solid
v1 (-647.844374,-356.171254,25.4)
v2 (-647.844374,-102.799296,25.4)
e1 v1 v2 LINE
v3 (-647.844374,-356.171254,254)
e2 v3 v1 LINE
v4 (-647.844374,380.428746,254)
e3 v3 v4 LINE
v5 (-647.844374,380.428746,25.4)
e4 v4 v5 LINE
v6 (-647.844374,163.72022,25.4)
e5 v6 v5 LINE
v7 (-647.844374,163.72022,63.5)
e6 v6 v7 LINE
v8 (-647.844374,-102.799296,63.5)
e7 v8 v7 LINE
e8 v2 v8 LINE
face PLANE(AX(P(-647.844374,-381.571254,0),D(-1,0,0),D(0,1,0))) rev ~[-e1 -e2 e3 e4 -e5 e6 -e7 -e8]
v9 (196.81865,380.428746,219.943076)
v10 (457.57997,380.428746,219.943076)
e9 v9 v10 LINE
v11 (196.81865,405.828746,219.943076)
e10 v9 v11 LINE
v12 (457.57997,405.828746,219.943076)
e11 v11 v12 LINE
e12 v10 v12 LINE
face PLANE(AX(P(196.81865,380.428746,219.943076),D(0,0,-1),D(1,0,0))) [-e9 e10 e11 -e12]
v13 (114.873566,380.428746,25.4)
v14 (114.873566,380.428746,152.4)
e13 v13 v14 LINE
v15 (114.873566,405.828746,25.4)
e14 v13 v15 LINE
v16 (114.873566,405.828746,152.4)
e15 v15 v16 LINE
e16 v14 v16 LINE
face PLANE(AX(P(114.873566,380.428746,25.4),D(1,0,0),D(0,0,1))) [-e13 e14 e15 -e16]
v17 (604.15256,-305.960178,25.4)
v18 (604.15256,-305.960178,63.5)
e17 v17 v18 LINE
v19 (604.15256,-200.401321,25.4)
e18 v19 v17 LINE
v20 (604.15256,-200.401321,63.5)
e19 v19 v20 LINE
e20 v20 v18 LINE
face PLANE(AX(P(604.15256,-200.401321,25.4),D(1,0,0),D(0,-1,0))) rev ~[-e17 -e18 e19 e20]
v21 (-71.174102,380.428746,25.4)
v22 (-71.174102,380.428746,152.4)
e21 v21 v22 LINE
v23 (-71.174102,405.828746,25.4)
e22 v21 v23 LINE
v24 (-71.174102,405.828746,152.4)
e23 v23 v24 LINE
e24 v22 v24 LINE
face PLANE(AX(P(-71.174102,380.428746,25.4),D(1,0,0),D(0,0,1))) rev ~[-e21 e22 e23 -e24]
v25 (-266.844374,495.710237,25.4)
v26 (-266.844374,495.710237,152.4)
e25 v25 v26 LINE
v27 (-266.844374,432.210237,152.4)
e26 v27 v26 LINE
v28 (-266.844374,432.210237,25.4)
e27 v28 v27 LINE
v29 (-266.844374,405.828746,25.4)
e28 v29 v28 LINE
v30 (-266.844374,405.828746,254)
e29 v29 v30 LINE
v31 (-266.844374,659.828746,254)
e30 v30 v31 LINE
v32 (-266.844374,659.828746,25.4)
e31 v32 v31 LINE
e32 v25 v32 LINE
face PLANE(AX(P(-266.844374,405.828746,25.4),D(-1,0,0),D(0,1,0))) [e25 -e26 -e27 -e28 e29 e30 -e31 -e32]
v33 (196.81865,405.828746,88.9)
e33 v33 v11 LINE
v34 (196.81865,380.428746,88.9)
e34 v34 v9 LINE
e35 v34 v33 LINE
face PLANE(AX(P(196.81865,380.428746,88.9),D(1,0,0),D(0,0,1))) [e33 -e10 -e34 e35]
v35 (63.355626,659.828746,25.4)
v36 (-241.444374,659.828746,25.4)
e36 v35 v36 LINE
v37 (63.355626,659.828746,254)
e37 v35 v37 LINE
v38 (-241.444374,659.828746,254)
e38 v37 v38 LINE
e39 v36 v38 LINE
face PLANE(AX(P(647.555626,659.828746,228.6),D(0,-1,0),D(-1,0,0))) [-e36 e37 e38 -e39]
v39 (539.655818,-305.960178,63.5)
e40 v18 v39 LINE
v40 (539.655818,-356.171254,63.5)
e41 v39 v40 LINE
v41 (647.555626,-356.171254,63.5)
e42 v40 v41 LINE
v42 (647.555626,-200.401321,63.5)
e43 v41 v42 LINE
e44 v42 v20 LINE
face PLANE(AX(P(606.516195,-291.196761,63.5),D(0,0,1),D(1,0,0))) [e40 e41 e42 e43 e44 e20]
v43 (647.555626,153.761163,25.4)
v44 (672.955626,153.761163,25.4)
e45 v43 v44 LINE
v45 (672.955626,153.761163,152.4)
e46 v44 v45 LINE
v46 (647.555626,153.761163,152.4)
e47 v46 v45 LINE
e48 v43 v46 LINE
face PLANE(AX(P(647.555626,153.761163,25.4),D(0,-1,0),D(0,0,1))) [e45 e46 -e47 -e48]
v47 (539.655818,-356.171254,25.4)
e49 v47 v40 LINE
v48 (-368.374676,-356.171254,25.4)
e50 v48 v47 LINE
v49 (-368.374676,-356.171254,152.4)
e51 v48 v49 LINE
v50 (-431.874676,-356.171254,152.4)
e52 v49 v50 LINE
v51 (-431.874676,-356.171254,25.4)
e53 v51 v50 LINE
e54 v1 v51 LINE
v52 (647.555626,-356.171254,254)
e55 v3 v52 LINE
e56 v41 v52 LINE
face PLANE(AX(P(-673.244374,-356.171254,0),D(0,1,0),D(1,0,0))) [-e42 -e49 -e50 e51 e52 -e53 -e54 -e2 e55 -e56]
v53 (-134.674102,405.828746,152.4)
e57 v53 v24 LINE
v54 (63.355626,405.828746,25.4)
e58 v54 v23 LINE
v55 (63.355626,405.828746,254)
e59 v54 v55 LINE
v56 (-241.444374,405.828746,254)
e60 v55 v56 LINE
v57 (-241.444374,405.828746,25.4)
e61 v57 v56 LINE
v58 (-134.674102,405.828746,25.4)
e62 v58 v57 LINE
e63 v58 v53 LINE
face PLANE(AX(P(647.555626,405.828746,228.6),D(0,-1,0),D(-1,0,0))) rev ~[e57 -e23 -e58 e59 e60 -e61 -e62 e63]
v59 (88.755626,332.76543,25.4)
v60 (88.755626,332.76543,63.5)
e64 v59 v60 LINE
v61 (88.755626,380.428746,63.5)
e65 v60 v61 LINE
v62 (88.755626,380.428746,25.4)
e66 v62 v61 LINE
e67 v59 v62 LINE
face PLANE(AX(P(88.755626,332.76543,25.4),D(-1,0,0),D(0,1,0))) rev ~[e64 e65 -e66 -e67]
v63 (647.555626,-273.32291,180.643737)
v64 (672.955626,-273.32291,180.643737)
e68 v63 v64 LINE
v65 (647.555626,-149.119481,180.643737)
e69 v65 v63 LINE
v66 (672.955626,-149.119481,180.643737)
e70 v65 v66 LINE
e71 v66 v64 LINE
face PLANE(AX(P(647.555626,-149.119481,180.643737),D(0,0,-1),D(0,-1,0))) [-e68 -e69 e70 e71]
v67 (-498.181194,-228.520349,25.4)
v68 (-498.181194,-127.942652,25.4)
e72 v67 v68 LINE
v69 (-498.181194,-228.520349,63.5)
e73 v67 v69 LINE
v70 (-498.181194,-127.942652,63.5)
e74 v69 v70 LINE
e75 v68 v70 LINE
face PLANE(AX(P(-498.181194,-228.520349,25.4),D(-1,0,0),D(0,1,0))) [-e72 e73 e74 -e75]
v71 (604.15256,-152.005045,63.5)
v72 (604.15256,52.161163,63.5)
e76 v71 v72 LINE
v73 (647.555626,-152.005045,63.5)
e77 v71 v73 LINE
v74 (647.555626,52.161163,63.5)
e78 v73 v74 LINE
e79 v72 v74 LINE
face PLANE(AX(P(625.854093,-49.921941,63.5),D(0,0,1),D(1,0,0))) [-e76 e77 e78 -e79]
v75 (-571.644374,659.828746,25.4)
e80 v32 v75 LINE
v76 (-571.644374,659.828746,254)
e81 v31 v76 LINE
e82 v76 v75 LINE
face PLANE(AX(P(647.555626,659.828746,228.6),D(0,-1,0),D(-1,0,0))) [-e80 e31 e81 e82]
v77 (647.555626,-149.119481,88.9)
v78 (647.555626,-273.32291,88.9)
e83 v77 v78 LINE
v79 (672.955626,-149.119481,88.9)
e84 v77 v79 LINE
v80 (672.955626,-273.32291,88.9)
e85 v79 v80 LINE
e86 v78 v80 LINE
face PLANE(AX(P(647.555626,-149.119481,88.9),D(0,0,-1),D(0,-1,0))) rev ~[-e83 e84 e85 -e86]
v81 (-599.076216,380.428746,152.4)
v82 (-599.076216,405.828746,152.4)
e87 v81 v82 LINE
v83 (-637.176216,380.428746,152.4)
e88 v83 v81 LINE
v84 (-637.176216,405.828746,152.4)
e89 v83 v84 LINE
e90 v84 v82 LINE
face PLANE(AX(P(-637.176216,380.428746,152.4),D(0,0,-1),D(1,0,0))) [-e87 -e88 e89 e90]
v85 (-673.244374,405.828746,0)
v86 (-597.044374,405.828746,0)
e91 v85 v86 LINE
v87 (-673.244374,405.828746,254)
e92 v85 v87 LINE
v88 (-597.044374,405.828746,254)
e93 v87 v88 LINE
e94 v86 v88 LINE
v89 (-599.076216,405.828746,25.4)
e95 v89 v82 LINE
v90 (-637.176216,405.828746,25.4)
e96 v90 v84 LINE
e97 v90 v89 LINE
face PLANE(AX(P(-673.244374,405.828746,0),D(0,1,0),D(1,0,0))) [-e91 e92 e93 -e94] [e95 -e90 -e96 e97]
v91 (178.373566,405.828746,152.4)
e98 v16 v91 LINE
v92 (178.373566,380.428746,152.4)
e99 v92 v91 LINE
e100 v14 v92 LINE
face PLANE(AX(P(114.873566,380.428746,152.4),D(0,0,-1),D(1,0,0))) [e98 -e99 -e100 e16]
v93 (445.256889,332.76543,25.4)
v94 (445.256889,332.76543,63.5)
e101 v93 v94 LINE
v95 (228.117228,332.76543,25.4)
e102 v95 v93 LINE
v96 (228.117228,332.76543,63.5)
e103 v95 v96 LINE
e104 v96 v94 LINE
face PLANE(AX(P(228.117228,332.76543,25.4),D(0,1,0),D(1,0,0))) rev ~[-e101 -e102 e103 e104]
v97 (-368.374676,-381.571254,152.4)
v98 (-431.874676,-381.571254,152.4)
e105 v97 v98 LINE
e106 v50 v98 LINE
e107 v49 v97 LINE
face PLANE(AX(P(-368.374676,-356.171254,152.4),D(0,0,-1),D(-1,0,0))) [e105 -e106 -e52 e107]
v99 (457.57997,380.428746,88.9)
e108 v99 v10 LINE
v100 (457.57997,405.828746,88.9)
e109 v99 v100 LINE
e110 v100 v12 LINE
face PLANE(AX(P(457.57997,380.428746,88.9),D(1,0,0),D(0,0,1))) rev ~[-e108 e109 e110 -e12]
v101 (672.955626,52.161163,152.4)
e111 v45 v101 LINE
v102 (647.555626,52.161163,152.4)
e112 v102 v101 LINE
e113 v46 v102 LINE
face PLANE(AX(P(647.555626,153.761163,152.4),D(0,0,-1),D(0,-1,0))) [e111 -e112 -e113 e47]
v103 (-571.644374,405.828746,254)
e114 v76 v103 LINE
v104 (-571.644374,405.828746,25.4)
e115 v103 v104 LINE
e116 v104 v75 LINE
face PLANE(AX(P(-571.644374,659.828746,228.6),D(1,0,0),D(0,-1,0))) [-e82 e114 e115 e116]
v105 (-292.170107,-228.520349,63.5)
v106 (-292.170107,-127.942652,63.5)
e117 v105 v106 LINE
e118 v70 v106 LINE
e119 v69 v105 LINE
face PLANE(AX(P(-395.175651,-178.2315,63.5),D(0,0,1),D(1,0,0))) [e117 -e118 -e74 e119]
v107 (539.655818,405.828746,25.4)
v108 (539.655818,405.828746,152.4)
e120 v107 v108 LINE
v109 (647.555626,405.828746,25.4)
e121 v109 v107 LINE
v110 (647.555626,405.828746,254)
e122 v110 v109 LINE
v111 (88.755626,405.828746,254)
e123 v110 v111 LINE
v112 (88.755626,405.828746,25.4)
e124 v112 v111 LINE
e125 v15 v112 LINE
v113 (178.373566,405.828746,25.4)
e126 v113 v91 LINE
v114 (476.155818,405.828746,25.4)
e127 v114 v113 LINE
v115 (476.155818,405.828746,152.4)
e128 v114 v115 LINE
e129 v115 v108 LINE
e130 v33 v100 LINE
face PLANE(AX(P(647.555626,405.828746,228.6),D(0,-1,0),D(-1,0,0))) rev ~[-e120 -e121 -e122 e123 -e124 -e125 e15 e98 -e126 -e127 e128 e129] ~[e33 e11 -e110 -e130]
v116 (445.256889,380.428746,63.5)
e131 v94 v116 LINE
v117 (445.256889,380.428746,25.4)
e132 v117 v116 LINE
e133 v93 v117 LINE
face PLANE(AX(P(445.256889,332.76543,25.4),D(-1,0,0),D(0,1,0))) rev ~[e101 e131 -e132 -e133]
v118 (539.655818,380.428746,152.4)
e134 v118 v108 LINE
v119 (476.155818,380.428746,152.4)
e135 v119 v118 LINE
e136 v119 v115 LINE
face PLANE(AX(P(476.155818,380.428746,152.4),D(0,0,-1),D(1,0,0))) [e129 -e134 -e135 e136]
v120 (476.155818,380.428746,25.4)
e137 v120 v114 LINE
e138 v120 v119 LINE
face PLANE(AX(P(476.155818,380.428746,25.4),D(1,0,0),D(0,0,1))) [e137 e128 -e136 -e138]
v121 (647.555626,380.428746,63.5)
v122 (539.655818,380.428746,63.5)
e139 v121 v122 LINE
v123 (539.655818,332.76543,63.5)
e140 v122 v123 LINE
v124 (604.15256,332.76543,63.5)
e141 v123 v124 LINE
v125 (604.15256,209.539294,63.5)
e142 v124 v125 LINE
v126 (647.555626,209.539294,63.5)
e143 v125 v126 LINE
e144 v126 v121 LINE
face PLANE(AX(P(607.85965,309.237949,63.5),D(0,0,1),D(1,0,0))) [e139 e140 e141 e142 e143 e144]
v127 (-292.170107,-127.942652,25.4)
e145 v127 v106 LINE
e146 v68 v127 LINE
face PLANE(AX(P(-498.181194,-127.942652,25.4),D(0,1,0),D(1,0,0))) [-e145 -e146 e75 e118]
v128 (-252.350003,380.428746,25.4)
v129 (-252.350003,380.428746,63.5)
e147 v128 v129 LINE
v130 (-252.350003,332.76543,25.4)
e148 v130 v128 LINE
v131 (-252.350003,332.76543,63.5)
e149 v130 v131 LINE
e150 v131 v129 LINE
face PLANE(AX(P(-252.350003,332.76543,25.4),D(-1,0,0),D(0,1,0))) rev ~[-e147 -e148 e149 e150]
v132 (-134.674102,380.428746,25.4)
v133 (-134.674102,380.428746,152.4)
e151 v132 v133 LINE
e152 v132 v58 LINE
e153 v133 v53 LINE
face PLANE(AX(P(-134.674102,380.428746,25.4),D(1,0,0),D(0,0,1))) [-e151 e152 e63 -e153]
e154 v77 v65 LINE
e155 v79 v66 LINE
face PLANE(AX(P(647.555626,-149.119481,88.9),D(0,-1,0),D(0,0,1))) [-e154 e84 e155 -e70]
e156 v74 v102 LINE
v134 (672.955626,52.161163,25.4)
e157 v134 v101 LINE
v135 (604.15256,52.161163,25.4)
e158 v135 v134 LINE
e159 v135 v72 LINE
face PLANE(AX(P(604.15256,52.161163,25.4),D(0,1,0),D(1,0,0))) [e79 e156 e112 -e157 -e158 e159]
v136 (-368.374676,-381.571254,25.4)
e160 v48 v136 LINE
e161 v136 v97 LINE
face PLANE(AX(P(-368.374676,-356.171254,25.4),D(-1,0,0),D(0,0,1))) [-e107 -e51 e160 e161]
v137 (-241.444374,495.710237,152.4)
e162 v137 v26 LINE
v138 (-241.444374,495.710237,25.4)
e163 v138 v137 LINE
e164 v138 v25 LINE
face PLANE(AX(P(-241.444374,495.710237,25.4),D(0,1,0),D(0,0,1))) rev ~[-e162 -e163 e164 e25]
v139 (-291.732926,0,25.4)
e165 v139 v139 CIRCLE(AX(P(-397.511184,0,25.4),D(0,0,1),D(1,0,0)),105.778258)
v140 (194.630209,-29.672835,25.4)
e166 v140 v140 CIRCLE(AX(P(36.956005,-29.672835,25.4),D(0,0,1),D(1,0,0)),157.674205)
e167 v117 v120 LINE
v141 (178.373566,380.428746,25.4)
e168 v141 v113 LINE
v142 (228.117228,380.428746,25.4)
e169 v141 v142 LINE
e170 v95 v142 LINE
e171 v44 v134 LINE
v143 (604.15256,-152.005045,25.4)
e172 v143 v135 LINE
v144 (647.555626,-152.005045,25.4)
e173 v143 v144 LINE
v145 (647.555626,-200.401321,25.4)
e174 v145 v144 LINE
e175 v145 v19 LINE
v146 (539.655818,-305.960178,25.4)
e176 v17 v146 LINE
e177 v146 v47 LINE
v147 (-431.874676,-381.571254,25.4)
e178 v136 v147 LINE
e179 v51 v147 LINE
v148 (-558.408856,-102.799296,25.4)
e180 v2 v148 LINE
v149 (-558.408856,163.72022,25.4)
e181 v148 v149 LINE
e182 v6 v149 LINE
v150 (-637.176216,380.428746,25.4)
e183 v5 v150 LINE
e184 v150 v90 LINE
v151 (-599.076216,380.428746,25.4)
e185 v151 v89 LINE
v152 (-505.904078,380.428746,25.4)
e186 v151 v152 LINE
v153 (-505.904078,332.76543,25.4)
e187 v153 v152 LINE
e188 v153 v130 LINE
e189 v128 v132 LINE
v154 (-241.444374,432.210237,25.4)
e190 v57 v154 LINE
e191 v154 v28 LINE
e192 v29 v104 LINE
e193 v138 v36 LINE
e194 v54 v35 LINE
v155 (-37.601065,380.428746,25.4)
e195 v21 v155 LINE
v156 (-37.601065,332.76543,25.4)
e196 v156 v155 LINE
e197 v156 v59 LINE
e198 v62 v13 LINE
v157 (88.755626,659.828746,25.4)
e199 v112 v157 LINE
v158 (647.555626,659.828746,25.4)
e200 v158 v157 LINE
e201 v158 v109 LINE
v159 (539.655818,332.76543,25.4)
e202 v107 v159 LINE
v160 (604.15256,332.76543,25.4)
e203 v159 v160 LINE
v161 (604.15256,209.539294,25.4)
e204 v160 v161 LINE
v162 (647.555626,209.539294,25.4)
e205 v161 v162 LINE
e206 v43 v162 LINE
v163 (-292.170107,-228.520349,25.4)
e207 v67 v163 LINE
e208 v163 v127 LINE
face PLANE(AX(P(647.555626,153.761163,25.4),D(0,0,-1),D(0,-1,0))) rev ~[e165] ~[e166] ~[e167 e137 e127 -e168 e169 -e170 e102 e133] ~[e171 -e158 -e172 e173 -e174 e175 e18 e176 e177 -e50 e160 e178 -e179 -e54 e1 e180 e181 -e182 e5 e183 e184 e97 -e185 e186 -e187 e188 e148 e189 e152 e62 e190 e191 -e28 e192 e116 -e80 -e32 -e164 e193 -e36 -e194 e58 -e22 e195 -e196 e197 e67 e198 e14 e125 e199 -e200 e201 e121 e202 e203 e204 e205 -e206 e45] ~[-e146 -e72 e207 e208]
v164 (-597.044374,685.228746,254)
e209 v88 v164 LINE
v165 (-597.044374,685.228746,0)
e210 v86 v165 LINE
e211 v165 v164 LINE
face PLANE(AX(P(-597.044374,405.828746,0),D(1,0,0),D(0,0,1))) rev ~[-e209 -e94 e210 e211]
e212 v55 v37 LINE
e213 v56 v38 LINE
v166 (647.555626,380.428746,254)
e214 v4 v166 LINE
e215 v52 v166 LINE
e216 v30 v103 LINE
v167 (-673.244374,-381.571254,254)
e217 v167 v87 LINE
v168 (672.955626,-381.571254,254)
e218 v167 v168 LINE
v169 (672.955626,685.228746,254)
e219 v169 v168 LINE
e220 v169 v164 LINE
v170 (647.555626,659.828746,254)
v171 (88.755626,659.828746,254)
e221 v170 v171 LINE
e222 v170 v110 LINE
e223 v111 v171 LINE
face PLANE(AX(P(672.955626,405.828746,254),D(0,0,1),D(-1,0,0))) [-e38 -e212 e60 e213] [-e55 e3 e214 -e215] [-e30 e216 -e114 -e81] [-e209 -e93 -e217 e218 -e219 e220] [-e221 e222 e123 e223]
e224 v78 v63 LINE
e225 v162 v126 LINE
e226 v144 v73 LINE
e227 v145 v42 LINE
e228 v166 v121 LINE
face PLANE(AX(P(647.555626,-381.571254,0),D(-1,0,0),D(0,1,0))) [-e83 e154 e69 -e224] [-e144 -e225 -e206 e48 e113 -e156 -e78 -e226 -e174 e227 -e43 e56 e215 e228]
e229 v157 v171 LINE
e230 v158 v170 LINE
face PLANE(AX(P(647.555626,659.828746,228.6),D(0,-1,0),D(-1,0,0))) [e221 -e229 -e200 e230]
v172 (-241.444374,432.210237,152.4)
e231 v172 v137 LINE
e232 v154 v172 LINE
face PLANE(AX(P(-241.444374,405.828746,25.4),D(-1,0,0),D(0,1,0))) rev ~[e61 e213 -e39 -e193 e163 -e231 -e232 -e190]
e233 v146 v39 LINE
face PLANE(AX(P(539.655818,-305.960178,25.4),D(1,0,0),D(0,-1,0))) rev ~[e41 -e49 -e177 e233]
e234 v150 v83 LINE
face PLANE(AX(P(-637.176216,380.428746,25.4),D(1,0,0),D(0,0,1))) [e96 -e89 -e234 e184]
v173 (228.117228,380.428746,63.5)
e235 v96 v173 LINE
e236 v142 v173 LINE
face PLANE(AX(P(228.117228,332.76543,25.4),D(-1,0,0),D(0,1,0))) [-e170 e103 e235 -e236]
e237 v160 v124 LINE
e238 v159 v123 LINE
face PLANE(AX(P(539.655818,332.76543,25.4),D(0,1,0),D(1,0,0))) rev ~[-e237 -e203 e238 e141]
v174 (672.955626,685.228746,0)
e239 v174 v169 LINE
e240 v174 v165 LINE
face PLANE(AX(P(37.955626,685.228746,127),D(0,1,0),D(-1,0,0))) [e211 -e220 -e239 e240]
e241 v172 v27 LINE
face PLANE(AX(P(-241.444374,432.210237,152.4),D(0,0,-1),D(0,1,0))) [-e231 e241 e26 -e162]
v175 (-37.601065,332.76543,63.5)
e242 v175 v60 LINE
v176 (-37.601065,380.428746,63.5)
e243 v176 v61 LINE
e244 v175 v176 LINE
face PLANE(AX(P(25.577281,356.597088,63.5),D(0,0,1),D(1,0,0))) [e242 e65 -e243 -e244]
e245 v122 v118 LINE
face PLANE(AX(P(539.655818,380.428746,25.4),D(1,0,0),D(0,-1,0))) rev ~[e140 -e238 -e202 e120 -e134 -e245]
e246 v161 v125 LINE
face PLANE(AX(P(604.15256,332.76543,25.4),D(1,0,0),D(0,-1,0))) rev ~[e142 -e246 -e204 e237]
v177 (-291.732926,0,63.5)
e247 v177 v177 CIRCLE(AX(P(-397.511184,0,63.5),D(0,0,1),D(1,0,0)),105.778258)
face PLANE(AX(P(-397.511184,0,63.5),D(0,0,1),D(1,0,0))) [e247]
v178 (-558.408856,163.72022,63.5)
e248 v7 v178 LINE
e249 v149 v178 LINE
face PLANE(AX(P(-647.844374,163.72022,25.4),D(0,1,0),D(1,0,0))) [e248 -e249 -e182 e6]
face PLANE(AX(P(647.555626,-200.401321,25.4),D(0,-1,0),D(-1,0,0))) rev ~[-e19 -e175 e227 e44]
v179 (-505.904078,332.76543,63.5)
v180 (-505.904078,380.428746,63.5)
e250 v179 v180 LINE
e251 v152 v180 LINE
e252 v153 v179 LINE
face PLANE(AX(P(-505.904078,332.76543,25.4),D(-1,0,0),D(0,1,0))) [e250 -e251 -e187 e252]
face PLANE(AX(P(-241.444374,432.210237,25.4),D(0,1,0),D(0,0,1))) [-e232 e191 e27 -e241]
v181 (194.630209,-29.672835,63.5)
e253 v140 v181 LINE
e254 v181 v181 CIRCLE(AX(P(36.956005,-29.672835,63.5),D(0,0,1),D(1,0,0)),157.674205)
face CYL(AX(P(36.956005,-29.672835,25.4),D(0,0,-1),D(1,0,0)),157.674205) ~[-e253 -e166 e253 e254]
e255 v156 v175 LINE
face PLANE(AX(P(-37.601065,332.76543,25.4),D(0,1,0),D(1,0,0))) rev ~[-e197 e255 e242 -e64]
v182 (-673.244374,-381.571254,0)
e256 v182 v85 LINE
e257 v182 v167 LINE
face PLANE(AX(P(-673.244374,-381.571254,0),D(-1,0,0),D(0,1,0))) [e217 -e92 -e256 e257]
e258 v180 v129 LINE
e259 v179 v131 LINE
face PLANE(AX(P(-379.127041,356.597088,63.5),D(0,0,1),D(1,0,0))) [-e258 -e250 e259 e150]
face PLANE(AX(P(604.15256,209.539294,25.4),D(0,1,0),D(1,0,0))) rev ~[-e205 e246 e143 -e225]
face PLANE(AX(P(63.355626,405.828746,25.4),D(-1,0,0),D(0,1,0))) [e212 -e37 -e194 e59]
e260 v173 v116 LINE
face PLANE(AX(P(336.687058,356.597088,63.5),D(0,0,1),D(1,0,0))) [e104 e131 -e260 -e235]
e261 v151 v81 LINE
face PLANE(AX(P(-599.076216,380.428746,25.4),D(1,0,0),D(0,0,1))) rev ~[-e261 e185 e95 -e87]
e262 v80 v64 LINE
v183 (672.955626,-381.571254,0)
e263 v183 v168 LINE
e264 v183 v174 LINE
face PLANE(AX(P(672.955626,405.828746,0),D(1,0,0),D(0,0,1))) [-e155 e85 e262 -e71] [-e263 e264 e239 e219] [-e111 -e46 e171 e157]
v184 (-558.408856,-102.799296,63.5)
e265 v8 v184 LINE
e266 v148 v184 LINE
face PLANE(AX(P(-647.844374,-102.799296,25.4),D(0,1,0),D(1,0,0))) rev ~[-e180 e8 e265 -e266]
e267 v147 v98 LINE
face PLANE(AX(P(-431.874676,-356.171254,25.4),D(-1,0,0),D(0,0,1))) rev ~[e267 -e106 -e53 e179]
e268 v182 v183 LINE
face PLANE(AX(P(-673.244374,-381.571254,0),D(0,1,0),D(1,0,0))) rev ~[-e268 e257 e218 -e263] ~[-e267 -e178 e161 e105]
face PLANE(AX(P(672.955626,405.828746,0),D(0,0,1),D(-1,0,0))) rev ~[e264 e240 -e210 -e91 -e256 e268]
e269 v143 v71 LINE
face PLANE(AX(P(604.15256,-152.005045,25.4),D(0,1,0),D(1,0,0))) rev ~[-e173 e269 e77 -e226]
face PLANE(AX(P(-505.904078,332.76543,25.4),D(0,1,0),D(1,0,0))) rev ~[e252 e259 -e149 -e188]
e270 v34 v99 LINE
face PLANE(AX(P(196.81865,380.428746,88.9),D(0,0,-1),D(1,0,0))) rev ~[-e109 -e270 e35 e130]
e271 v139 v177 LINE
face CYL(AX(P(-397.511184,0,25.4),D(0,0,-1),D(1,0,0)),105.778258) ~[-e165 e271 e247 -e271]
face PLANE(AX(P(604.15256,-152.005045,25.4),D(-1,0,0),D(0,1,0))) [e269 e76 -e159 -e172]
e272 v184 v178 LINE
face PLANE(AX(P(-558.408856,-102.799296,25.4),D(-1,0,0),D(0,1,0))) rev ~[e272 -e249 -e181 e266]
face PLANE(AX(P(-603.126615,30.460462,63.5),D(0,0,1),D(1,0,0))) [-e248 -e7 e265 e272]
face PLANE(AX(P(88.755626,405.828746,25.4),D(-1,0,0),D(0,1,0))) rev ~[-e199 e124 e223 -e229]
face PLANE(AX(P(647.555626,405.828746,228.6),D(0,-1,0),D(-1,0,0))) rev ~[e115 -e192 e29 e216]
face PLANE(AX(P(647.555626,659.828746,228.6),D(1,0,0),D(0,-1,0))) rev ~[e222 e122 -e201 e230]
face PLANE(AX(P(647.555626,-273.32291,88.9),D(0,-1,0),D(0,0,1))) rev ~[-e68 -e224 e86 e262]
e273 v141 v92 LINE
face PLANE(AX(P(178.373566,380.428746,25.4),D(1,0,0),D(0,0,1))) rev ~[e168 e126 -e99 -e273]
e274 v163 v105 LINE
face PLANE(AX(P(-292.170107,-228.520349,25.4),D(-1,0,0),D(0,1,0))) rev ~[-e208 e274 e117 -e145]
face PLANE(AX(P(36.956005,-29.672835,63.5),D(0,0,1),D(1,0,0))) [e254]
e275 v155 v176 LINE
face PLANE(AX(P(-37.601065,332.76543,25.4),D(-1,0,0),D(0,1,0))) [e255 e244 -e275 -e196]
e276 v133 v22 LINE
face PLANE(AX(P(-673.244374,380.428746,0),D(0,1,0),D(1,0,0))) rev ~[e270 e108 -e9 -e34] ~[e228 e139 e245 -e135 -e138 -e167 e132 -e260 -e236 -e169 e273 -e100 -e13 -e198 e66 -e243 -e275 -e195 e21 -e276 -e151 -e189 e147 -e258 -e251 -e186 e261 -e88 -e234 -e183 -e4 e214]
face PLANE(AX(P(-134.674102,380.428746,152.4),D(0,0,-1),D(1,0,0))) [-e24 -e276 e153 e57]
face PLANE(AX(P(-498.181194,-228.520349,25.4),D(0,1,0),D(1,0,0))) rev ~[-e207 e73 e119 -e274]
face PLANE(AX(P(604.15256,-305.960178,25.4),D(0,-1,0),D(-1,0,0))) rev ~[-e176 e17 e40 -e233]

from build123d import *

# Parameters (mm, degrees)
F0_W      = 1346.2
F0_H      = 787.4
F1_DEPTH  = 254
F2_T      = -25.4
F3_W      = 1270
F3_H      = 254
F4_DEPTH  = 279.4
F5_T      = -25.4
F6_W      = 25.4
F6_H      = 254
F7_DEPTH  = 228.6
F8_W      = 63.5
F8_H      = 127
F9_DEPTH  = 25.4
F10_W     = 25.4
F10_H     = 254
F11_DEPTH = 228.6
F12_W     = 63.5
F12_H     = 127
F13_DEPTH = 25.4
F14_W     = 63.5
F14_H     = 127
F15_DEPTH = 25.4
F16_W     = 63.5
F16_H     = 127
F17_DEPTH = 25.4
F18_W     = 101.6
F18_H     = 127
F19_DEPTH = 25.4
F20_W     = 260.761320591
F20_H     = 131.0430763721
F21_DEPTH = 25.4
F22_W     = 124.2034286261
F22_H     = 91.7437373161
F23_DEPTH = 25.4
F24_W     = 38.1
F24_H     = 127
F25_DEPTH = 25.4
F26_W     = 43.4030661404
F26_H     = 204.1662087968
F27_DEPTH = 38.1
F28_W     = 217.1396613121
F28_H     = 47.6633155483
F29_DEPTH = 38.1
F30_W     = 126.3566912651
F30_H     = 47.6633155483
F31_DEPTH = 38.1
F32_W     = 253.5540759563
F32_H     = 47.6633155483
F33_DEPTH = 38.1
F34_W     = 206.0110867023
F34_H     = 100.5776971579
F35_DEPTH = 38.1
F36_W     = 89.4355172336
F36_H     = 266.5195167065
F37_DEPTH = 38.1
F38_R     = 105.778257903
F39_DEPTH = 38.1
F40_R     = 157.6742046587
F41_DEPTH = 38.1


# Not quite as in the source:
# - a shell that OpenCascade refuses in one call is made with other operations: the cavity is built on its own and cut out


with BuildPart() as f1:
    # F0 (on Top) → F1 (new body)
    with BuildSketch(Plane.XY):
        with Locations((-0.1443736255, 12.1287457604)):
            Rectangle(F0_W, F0_H)
    extrude(amount=F1_DEPTH)

    # F2
    f2_openings = [f1.faces().sort_by_distance(p)[0] for p in [
        (-0.144374, 12.128746, 254),
    ]]
    offset(amount=F2_T, openings=f2_openings)

    # F3 (on face) → F4 (join)
    with BuildSketch(Plane(origin=(0, 405.8287457604, 0), x_dir=(-1, 0, 0), z_dir=(0, 1, 0))):
        with Locations((-37.9556263745, 127)):
            Rectangle(F3_W, F3_H)
    extrude(amount=F4_DEPTH)

    # F5: a shell. OpenCascade refuses it in one call, so the cavity is built on its own and cut out:
    # the body offset inwards by the wall thickness, plus a prism from it out through each open face.
    f5_core = offset(f1.part, amount=F5_T, kind=Kind.INTERSECTION, mode=Mode.PRIVATE)
    f5_exits = [f5_core.faces().sort_by_distance(p)[0] for p in [
        (37.955626, 532.828746, 228.6),
    ]]
    add(f5_core, mode=Mode.SUBTRACT)
    extrude(f5_exits, amount=-F5_T, mode=Mode.SUBTRACT)

    # F6 (on face) → F7 (join)
    with BuildSketch(Plane.XY.offset(25.4)):
        with Locations((-254.1443736255, 532.8287457604)):
            Rectangle(F6_W, F6_H)
    extrude(amount=F7_DEPTH)

    # F8 (on face) → F9 (cut)
    with BuildSketch(Plane.YZ.offset(-241.4443736255)):
        with Locations((463.9602367878, 88.9)):
            Rectangle(F8_W, F8_H)
    extrude(amount=-F9_DEPTH, mode=Mode.SUBTRACT)

    # F10 (on face) → F11 (join)
    with BuildSketch(Plane.XY.offset(25.4)):
        with Locations((76.0556263745, 532.8287457604)):
            Rectangle(F10_W, F10_H)
    extrude(amount=F11_DEPTH)

    # F12 (on face) → F13 (cut)
    with BuildSketch(Plane.XZ.offset(-380.4287457604)):
        with Locations((-102.9241020679, 88.9)):
            Rectangle(F12_W, F12_H)
    extrude(amount=-F13_DEPTH, mode=Mode.SUBTRACT)

    # F14 (on face) → F15 (cut)
    with BuildSketch(Plane.XZ.offset(-380.4287457604)):
        with Locations((146.6235657334, 88.9)):
            Rectangle(F14_W, F14_H)
        with Locations((507.9058175087, 88.9)):
            Rectangle(F14_W, F14_H)
    extrude(amount=-F15_DEPTH, mode=Mode.SUBTRACT)

    # F16 (on face) → F17 (cut)
    with BuildSketch(Plane(origin=(0, -356.1712542396, 0), x_dir=(-1, 0, 0), z_dir=(0, 1, 0))):
        with Locations((400.1246755123, 88.9)):
            Rectangle(F16_W, F16_H)
    extrude(amount=-F17_DEPTH, mode=Mode.SUBTRACT)

    # F18 (on face) → F19 (cut)
    with BuildSketch(Plane(origin=(647.5556263745, 0, 0), x_dir=(0, -1, 0), z_dir=(-1, 0, 0))):
        with Locations((-102.9611633539, 88.9)):
            Rectangle(F18_W, F18_H)
    extrude(amount=-F19_DEPTH, mode=Mode.SUBTRACT)

    # F20 (on face) → F21 (cut)
    with BuildSketch(Plane.XZ.offset(-380.4287457604)):
        with Locations((327.1993100643, 154.4215381861)):
            Rectangle(F20_W, F20_H)
    extrude(amount=-F21_DEPTH, mode=Mode.SUBTRACT)

    # F22 (on face) → F23 (cut)
    with BuildSketch(Plane(origin=(647.5556263745, 0, 0), x_dir=(0, -1, 0), z_dir=(-1, 0, 0))):
        with Locations((211.2211957574, 134.7718686581)):
            Rectangle(F22_W, F22_H)
    extrude(amount=-F23_DEPTH, mode=Mode.SUBTRACT)

    # F24 (on face) → F25 (cut)
    with BuildSketch(Plane.XZ.offset(-380.4287457604)):
        with Locations((-618.1262156487, 88.9)):
            Rectangle(F24_W, F24_H)
    extrude(amount=-F25_DEPTH, mode=Mode.SUBTRACT)

    # F26 (on face) → F27 (join)
    with BuildSketch(Plane.XY.offset(25.4)):
        Polygon((647.5556263745, 380.4287457604), (539.6558175087, 380.4287457604), (539.6558175087, 332.765430212), (604.1525602341, 332.765430212), (604.1525602341, 209.5392942429), (647.5556263745, 209.5392942429), align=None)
        with Locations((625.8540933043, -49.9219410445)):
            Rectangle(F26_W, F26_H)
        Polygon((647.5556263745, -356.1712542396), (647.5556263745, -200.4013210535), (604.1525602341, -200.4013210535), (604.1525602341, -305.9601783752), (539.6558175087, -305.9601783752), (539.6558175087, -356.1712542396), align=None)
    extrude(amount=F27_DEPTH)

    # F28 (on face) → F29 (join)
    with BuildSketch(Plane.XY.offset(25.4)):
        with Locations((336.6870582104, 356.5970879862)):
            Rectangle(F28_W, F28_H)
    extrude(amount=F29_DEPTH)

    # F30 (on face) → F31 (join)
    with BuildSketch(Plane.XY.offset(25.4)):
        with Locations((25.5772807419, 356.5970879862)):
            Rectangle(F30_W, F30_H)
    extrude(amount=F31_DEPTH)

    # F32 (on face) → F33 (join)
    with BuildSketch(Plane.XY.offset(25.4)):
        with Locations((-379.1270405054, 356.5970879862)):
            Rectangle(F32_W, F32_H)
    extrude(amount=F33_DEPTH)

    # F34 (on face) → F35 (join)
    with BuildSketch(Plane.XY.offset(25.4)):
        with Locations((-395.1756507158, -178.2315000892)):
            Rectangle(F34_W, F34_H)
    extrude(amount=F35_DEPTH)

    # F36 (on face) → F37 (join)
    with BuildSketch(Plane.XY.offset(25.4)):
        with Locations((-603.1266150087, 30.4604619741)):
            Rectangle(F36_W, F36_H)
    extrude(amount=F37_DEPTH)

    # F38 (on face) → F39 (join)
    with BuildSketch(Plane.XY.offset(25.4)):
        with Locations((-397.5111842155, 0)):
            Circle(F38_R)
    extrude(amount=F39_DEPTH)

    # F40 (on face) → F41 (join)
    with BuildSketch(Plane.XY.offset(25.4)):
        with Locations((36.9560047984, -29.6728350222)):
            Circle(F40_R)
    extrude(amount=F41_DEPTH)


solid = f1.part
